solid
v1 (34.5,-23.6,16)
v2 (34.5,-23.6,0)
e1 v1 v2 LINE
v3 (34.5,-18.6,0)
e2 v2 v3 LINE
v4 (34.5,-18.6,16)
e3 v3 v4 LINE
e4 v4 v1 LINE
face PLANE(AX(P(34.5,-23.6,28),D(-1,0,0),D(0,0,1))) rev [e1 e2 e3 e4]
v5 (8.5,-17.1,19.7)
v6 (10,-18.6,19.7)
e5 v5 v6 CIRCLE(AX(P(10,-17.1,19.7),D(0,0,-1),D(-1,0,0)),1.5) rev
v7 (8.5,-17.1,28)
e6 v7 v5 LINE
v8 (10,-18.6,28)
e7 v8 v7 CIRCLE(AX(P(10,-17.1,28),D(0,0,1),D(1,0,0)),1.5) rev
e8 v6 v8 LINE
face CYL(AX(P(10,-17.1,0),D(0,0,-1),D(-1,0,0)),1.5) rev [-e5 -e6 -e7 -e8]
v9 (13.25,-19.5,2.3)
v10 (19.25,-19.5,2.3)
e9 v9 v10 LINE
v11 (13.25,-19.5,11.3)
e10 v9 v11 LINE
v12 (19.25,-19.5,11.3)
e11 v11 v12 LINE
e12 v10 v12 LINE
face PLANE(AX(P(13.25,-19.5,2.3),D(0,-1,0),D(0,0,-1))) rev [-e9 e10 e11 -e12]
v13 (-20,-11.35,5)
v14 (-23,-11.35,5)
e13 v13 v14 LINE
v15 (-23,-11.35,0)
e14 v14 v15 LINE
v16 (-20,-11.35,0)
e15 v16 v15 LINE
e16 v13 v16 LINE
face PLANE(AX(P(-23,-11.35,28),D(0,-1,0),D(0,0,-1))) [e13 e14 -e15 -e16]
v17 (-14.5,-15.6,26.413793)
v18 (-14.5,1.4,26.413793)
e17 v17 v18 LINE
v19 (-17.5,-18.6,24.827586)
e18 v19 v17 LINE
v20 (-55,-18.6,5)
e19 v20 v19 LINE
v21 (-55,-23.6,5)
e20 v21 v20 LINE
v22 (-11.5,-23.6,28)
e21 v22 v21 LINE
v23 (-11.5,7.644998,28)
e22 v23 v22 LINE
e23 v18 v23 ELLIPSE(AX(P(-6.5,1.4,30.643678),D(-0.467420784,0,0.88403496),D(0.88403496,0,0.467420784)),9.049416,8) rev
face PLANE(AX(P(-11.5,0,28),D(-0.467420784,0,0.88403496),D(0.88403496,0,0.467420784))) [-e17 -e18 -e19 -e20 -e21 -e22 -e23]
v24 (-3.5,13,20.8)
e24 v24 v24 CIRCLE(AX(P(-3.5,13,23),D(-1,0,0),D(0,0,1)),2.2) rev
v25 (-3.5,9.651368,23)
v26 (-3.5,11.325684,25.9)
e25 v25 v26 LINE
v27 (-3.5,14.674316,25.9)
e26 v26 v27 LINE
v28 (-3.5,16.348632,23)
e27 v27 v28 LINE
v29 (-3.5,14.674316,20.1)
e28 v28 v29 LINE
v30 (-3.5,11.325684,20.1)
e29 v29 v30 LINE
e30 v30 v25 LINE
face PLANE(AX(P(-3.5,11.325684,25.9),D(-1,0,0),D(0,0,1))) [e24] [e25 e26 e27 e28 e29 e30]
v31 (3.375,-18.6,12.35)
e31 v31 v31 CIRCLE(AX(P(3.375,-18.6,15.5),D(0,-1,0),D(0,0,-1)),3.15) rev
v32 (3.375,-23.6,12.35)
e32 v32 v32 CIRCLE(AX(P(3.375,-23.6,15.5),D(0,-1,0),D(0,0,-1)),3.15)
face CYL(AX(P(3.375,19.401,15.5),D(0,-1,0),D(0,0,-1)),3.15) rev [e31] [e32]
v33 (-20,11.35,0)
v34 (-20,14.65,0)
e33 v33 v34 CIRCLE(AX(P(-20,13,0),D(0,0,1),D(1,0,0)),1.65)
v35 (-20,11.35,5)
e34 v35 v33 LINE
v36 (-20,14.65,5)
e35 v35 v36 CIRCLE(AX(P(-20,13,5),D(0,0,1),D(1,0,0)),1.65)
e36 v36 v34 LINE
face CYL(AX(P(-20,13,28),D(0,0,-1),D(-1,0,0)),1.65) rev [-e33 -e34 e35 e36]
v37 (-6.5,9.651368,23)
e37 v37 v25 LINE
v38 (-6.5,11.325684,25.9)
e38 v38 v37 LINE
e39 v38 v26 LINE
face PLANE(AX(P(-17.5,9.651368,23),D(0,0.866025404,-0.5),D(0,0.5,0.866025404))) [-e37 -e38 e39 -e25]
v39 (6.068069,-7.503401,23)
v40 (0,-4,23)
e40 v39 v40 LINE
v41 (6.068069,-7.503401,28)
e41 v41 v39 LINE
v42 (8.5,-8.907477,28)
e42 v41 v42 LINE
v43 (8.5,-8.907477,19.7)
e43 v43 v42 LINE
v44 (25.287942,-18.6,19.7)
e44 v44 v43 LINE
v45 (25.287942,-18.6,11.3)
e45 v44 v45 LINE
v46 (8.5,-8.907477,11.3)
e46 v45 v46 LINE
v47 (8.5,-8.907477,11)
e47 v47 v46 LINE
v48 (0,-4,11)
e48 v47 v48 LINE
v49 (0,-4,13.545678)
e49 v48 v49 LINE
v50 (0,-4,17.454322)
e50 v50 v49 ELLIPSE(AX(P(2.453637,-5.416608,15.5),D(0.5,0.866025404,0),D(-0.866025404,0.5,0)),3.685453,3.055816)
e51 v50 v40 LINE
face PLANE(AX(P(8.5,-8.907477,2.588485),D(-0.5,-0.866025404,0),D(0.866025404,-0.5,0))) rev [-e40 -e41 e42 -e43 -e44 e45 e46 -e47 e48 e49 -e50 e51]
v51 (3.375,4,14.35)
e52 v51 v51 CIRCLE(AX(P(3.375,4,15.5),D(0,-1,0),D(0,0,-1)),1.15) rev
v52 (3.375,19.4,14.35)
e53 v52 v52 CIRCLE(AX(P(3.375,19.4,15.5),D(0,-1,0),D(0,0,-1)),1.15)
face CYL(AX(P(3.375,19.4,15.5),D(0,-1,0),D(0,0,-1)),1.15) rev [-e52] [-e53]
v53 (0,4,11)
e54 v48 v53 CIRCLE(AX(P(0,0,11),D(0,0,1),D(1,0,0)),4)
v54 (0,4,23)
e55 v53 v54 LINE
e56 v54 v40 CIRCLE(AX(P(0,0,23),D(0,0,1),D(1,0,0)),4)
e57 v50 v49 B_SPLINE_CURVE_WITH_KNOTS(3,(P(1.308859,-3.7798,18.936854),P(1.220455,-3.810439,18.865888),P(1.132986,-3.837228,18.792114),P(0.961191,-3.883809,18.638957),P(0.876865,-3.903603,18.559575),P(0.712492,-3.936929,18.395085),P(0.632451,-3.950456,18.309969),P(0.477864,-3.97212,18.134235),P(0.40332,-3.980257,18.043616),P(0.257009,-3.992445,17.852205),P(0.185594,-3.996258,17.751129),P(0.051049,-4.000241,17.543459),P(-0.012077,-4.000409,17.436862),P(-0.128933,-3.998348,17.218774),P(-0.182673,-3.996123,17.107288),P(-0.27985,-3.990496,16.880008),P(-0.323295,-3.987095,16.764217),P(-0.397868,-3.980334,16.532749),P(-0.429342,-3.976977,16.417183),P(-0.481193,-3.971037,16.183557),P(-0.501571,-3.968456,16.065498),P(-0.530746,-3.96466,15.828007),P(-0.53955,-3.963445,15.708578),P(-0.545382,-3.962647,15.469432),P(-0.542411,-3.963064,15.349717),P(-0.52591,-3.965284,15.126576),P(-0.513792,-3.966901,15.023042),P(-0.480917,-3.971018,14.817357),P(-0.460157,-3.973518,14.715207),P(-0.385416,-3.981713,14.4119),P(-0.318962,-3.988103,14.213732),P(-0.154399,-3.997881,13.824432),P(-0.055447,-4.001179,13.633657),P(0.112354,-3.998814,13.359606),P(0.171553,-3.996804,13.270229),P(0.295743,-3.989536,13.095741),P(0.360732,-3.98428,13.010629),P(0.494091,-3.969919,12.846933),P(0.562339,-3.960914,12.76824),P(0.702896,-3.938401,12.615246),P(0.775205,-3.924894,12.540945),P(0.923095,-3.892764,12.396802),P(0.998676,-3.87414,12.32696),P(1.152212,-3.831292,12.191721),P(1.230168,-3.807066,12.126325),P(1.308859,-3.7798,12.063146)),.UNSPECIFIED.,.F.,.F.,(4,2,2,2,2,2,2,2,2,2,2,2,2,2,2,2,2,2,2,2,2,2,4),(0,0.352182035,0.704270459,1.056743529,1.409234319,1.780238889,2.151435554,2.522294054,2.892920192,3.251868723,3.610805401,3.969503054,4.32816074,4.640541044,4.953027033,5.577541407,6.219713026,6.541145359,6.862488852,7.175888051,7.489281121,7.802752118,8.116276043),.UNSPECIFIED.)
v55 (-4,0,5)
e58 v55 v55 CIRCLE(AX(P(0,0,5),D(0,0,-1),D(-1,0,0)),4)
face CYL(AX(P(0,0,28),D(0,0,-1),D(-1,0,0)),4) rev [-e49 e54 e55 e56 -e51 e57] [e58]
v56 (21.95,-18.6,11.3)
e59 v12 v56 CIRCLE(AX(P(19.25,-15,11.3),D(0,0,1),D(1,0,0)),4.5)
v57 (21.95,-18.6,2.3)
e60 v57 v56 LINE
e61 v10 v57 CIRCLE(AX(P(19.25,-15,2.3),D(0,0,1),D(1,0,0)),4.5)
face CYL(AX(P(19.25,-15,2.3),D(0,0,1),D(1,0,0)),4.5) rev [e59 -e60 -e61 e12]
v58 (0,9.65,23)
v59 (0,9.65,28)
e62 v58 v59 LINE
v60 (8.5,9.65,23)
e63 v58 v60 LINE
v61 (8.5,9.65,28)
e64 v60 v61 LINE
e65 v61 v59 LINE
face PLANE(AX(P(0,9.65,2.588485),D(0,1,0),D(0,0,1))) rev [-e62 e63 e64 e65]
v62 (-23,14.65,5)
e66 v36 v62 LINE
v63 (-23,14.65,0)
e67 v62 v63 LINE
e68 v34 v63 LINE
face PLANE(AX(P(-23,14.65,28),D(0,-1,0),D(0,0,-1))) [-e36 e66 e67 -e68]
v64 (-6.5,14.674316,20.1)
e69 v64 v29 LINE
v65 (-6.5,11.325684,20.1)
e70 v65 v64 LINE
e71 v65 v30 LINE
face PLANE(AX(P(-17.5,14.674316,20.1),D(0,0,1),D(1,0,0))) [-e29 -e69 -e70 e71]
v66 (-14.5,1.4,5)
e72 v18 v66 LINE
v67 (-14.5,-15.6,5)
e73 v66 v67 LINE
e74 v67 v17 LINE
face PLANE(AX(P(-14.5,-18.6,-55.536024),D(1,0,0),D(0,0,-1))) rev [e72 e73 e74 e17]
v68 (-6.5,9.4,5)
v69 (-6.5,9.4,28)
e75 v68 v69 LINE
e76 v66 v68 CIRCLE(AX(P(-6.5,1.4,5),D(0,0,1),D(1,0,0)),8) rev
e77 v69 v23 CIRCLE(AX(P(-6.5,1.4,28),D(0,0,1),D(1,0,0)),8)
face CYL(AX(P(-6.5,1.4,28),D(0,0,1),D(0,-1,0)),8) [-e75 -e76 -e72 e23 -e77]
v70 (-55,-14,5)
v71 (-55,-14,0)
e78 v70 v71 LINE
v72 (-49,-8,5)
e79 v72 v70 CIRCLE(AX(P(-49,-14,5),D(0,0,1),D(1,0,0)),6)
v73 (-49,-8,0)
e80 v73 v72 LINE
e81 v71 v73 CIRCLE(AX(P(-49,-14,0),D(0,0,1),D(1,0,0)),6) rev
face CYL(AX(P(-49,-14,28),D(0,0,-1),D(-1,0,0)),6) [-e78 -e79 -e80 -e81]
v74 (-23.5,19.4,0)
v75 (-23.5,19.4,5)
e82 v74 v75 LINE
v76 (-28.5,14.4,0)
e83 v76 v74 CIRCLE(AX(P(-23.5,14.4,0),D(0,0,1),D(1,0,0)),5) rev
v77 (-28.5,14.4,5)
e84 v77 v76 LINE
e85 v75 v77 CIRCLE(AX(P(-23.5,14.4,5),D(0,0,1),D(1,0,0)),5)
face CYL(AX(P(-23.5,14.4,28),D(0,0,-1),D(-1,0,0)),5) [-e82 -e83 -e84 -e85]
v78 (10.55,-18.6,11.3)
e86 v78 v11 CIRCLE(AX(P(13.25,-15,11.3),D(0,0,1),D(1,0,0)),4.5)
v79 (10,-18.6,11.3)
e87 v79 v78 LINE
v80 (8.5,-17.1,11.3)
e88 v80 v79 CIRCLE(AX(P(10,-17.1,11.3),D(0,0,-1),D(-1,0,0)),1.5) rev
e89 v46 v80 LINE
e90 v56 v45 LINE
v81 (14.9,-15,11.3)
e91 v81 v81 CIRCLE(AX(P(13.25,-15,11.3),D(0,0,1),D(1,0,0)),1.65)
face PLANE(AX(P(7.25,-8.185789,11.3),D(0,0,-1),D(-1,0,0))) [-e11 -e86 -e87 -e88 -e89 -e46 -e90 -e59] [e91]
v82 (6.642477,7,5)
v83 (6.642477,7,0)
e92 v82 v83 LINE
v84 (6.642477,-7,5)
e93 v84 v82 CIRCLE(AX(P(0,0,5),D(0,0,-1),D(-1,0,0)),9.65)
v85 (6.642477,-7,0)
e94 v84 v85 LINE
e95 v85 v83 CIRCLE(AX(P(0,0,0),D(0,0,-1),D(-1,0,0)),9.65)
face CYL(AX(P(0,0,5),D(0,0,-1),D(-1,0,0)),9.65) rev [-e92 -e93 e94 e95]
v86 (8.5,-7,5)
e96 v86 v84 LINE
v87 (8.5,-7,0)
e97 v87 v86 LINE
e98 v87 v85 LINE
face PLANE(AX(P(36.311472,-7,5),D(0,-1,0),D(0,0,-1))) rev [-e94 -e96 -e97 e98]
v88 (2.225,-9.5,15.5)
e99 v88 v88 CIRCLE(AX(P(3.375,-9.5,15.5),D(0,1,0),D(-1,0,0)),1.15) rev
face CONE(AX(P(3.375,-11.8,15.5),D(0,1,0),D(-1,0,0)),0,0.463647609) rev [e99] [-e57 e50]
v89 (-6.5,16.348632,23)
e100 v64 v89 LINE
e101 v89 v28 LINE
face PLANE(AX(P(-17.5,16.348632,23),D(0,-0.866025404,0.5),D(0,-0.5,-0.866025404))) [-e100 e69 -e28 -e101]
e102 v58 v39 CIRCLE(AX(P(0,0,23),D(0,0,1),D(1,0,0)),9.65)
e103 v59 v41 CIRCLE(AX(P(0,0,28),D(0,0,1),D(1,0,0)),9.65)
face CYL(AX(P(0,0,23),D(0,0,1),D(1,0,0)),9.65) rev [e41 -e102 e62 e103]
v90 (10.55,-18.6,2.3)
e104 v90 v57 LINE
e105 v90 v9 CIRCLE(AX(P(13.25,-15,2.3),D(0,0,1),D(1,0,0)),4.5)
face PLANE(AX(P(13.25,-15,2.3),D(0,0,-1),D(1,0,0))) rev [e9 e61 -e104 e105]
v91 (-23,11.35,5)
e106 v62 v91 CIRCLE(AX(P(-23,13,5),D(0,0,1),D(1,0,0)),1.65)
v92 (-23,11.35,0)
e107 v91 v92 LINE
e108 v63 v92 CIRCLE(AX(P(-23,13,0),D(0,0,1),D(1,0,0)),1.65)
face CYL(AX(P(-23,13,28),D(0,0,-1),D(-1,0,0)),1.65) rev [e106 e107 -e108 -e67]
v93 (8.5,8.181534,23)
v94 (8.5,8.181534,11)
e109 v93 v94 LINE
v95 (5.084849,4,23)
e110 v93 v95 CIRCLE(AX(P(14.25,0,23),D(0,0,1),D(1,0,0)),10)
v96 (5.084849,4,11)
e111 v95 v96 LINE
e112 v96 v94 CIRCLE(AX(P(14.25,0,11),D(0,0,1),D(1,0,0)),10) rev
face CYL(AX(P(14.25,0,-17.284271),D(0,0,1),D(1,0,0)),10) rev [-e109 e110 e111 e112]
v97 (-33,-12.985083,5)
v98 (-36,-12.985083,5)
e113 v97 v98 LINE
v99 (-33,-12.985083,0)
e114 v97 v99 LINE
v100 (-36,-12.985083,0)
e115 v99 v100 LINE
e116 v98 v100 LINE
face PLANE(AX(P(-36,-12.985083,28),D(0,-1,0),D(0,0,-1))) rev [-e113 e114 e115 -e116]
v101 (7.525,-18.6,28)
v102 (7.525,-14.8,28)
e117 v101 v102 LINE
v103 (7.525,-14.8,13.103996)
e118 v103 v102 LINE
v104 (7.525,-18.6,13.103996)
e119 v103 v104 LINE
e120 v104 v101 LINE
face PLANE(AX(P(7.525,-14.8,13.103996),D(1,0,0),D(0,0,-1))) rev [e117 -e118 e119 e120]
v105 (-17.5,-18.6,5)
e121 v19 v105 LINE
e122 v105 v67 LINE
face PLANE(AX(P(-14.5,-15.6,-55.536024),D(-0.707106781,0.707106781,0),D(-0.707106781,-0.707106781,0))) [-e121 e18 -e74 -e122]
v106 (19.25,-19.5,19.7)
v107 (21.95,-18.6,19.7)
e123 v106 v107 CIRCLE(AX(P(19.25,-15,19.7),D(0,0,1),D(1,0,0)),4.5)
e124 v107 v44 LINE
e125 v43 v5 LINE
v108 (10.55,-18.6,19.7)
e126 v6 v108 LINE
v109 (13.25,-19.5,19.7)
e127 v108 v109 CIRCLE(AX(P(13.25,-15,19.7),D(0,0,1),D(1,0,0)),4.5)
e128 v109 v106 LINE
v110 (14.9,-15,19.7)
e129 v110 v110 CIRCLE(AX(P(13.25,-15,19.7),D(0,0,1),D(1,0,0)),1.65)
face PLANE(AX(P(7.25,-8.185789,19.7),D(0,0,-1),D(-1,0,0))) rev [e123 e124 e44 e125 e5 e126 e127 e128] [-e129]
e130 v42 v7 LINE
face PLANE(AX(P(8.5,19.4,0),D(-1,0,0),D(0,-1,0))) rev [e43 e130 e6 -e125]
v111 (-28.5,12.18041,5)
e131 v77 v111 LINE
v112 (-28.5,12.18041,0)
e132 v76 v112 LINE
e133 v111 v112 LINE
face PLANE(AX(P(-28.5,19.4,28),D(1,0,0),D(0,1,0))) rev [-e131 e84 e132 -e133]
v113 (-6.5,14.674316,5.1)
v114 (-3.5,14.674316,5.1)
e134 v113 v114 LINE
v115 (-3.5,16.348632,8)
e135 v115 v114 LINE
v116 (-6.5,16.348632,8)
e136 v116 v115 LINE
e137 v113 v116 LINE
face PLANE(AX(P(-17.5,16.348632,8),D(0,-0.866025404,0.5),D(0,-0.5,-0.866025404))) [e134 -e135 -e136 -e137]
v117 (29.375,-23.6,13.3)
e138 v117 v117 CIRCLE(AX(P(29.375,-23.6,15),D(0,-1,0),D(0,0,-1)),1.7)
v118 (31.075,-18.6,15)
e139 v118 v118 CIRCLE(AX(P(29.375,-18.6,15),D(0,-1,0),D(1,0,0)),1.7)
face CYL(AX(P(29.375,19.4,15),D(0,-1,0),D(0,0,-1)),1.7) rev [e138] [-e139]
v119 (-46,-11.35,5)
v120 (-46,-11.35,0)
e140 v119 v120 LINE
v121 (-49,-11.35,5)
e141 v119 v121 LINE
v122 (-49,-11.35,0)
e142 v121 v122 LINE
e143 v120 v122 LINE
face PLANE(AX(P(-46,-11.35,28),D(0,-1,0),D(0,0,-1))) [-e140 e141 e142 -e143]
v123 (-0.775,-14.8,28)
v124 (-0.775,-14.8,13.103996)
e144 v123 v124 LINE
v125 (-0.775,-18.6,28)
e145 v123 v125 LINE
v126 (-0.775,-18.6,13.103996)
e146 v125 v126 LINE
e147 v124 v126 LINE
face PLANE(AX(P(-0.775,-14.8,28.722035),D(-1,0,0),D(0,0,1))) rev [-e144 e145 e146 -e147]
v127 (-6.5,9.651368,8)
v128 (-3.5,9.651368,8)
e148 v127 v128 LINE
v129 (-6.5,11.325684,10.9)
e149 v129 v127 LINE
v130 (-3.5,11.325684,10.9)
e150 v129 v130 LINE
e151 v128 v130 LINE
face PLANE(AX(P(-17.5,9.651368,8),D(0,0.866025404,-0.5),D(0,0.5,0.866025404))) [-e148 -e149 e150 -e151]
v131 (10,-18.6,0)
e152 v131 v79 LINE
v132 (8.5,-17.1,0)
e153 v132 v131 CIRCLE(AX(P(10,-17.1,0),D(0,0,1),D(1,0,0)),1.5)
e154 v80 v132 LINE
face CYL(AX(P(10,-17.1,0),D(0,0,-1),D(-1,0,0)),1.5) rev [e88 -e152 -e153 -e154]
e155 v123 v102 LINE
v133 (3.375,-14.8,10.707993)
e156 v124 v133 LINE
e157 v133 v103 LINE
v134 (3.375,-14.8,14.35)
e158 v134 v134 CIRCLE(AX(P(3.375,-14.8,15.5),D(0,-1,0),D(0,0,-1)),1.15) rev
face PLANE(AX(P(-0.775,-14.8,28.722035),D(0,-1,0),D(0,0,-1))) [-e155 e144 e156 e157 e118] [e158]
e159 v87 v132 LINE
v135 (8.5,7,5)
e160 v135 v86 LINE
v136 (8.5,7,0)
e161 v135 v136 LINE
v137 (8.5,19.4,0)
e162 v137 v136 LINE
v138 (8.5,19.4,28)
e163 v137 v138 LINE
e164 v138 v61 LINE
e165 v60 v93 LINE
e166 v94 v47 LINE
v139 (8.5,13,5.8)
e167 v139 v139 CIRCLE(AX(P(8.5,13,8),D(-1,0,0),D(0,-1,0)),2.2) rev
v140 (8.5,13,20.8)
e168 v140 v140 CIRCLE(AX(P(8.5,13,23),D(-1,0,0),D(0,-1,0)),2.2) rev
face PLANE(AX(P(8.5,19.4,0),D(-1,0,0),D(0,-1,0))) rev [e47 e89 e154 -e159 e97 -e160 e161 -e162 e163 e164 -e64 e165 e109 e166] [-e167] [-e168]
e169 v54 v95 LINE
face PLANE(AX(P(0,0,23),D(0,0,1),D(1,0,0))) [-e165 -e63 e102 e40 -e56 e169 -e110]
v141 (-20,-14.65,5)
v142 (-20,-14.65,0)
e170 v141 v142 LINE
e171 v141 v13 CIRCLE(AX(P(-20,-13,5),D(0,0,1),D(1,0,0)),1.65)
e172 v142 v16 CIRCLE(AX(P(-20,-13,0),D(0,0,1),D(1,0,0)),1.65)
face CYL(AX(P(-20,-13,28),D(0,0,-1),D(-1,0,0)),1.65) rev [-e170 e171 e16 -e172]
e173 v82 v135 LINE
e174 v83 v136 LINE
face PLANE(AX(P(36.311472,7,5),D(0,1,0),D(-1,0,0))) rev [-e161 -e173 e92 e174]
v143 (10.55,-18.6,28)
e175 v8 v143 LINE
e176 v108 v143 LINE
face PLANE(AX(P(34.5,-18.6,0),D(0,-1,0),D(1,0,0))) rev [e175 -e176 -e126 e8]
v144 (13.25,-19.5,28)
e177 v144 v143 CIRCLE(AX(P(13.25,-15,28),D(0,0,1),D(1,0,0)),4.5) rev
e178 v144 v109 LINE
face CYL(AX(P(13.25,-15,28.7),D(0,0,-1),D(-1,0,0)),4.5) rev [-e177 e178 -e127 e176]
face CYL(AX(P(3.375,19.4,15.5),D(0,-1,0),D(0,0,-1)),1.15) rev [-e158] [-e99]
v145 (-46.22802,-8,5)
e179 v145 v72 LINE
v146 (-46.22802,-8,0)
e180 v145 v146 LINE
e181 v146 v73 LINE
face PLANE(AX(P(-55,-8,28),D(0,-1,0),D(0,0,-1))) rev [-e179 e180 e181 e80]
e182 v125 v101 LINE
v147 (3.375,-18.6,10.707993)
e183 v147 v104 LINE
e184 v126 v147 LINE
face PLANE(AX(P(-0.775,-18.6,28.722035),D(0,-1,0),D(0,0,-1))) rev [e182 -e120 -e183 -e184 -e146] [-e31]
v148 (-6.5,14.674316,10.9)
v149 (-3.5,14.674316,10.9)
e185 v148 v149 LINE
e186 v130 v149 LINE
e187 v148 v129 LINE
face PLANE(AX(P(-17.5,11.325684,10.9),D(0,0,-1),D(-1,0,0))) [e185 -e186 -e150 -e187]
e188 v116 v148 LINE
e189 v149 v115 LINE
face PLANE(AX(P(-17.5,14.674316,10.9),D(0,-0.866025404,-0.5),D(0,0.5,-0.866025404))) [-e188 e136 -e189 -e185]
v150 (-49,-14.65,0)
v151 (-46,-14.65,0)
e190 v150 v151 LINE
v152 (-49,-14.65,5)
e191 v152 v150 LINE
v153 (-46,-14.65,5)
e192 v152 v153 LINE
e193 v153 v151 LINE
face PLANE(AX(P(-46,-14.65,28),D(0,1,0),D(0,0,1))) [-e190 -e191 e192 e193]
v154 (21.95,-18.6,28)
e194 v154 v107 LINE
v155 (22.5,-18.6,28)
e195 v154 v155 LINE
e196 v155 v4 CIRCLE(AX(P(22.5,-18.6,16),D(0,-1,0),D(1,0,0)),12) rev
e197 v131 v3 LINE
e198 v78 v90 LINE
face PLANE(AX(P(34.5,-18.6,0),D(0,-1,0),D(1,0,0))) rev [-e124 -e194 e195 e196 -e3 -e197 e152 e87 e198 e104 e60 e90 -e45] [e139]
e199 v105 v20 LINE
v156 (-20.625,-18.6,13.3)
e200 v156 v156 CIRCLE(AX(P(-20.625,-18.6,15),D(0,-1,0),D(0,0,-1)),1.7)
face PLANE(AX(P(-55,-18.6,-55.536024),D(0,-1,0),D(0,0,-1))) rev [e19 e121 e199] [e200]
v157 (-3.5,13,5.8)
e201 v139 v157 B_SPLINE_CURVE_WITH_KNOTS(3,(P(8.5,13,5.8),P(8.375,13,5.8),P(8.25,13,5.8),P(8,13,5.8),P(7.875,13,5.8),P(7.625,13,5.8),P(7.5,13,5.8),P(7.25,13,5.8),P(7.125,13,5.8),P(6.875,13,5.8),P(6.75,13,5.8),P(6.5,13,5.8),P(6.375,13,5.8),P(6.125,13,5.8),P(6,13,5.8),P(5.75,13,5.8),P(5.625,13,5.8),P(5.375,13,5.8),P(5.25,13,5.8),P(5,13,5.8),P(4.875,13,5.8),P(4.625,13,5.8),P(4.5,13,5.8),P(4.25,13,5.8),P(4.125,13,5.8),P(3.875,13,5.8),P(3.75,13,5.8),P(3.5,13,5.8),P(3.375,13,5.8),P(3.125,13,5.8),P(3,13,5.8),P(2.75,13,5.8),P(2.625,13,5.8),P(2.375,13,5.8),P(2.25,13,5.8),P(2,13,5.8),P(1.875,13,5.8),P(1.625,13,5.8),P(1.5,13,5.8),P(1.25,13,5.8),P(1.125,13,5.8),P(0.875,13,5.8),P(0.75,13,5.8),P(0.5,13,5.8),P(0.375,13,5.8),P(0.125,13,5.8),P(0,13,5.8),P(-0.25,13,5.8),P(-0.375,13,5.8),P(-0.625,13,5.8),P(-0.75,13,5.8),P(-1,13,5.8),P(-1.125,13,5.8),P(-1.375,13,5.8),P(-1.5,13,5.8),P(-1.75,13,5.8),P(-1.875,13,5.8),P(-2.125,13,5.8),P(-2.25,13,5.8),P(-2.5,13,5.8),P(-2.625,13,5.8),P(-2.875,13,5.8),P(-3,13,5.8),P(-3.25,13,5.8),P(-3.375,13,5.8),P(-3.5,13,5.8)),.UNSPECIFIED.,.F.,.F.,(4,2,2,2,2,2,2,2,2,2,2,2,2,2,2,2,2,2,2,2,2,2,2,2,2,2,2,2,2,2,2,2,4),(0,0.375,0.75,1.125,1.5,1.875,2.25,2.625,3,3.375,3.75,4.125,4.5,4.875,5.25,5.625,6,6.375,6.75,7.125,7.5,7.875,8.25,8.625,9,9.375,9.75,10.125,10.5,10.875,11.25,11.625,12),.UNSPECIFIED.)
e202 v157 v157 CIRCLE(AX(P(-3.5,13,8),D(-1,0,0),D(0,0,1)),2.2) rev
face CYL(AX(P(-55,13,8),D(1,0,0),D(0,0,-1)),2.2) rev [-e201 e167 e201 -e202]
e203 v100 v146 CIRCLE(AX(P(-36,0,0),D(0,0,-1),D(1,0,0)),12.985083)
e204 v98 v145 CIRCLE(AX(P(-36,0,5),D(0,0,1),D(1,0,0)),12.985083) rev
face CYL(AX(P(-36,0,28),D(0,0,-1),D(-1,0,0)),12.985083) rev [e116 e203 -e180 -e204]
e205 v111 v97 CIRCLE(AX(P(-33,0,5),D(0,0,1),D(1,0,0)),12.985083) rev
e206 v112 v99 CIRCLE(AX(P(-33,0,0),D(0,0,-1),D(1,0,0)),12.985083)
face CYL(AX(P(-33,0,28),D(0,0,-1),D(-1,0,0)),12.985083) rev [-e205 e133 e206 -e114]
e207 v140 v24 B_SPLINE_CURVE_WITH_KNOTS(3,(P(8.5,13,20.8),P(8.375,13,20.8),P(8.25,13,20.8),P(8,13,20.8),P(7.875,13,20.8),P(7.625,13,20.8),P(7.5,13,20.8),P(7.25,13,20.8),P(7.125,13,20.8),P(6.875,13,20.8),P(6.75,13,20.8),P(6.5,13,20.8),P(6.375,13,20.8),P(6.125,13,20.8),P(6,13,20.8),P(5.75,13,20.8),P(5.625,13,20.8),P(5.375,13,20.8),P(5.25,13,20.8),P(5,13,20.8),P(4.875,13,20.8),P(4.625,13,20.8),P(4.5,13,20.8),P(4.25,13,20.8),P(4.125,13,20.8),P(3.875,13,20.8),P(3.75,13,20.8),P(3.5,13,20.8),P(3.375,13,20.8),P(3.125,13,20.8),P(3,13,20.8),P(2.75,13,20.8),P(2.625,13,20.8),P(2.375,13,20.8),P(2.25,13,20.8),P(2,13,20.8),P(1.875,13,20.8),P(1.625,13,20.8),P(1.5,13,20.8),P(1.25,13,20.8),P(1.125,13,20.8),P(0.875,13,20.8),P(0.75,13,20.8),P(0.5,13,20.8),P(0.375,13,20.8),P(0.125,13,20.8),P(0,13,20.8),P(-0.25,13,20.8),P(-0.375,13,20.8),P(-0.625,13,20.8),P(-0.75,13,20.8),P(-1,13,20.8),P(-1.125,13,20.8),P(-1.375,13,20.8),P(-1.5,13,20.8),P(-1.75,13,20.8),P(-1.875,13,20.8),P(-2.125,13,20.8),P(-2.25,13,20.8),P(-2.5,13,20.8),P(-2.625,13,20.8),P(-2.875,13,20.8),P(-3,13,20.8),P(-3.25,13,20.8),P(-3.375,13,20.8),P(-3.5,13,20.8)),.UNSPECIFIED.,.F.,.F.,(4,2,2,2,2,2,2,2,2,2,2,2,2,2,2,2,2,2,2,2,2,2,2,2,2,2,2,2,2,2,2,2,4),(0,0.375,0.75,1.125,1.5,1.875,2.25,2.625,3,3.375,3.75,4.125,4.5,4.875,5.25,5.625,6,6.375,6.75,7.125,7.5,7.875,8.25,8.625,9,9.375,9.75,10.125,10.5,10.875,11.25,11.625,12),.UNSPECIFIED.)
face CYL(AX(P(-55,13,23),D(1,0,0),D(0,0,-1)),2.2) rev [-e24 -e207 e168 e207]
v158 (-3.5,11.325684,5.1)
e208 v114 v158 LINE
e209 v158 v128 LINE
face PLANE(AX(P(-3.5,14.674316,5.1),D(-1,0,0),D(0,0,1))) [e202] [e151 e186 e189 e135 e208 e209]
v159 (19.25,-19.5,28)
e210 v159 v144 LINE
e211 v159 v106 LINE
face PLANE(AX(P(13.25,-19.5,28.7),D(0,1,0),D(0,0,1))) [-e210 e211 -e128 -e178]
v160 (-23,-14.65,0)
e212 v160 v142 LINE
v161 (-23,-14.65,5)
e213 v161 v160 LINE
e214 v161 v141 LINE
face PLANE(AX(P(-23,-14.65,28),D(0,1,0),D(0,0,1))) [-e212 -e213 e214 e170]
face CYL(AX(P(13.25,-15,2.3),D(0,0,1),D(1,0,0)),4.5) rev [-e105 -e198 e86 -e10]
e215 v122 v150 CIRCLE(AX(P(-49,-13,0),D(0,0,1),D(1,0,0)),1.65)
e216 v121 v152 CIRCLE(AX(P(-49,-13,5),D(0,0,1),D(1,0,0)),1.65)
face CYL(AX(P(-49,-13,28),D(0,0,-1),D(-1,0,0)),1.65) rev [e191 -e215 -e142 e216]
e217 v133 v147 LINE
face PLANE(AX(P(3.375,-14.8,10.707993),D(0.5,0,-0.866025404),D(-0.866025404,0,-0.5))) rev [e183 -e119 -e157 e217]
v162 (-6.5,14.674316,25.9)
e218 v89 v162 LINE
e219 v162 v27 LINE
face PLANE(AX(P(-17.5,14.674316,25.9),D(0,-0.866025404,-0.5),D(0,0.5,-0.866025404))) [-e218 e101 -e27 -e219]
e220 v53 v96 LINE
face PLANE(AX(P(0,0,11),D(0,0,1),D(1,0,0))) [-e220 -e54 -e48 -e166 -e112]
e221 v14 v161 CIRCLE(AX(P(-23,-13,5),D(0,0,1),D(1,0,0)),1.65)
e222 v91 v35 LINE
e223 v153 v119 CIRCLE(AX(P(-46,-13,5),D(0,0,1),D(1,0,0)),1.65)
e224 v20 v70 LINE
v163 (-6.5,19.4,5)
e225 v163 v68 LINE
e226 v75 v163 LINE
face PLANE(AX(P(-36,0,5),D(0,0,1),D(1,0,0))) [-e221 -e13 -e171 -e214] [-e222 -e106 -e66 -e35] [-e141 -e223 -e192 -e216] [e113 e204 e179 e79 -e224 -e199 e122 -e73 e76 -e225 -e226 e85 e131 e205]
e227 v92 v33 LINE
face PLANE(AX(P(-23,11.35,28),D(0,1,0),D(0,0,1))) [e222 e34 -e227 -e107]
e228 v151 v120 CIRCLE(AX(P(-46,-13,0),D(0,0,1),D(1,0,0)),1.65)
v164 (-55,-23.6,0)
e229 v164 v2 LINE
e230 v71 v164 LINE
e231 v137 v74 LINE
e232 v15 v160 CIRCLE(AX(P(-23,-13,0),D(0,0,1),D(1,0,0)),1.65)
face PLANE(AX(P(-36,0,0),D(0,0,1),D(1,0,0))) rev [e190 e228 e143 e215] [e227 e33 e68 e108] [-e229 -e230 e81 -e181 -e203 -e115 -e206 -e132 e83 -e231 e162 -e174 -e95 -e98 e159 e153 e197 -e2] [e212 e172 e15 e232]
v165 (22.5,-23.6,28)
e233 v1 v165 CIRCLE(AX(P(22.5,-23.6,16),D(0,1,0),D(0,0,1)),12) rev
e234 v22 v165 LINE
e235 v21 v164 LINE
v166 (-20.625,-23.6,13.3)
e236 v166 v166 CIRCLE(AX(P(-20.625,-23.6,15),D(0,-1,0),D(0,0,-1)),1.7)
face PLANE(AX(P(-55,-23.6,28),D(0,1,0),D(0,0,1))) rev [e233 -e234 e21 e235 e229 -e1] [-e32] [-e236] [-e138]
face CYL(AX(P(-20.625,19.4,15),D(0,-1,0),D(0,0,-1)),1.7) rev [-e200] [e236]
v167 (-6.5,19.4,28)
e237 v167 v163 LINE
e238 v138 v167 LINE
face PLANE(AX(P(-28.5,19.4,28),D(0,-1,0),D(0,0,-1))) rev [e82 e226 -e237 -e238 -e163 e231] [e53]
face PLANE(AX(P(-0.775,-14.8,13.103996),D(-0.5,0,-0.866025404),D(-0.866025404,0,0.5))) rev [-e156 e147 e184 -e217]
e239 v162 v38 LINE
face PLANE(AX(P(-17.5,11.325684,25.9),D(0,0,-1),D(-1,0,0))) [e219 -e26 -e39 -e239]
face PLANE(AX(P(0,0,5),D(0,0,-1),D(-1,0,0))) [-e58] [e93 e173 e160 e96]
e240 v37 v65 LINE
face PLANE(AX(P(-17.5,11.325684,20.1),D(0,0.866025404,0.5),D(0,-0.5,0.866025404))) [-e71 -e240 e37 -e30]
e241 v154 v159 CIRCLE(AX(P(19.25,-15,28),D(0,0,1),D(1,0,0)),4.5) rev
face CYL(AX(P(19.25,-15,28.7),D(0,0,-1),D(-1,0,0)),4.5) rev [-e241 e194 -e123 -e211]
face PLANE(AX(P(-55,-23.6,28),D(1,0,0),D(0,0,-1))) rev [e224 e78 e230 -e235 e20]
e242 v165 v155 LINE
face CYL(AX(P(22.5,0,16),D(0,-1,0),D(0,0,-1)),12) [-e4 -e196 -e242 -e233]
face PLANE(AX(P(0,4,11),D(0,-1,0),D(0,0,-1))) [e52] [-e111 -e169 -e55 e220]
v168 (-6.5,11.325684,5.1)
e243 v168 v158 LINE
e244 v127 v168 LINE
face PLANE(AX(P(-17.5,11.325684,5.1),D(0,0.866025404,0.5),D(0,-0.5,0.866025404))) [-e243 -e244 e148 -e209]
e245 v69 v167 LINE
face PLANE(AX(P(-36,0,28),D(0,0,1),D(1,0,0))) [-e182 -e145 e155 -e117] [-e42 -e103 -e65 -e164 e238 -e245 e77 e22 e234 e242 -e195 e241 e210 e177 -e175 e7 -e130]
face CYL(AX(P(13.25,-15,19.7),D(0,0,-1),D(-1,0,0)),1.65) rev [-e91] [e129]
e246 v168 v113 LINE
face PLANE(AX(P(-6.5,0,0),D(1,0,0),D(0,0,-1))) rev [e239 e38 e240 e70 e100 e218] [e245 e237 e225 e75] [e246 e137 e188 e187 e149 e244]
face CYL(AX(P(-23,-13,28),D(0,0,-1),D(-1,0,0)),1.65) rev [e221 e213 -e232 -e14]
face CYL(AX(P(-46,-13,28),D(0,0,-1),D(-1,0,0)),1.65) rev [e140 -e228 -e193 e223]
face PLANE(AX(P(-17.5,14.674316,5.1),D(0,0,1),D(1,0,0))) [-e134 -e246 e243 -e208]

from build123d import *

# Parameters (mm, degrees)
SKETCH1_R                = 4
BOSS_EXTRUDE1_DEPTH      = 28
SKETCH2_W                = 40.5
SKETCH2_H                = 38
CUT_EXTRUDE1_DEPTH       = 23
SKETCH3_R                = 9.65
CUT_EXTRUDE2_DEPTH       = 5
SKETCH8_R                = 1.15
CUT_EXTRUDE7_DEPTH       = 76.219678276
SKETCH9_R                = 2.2
CUT_EXTRUDE8_DEPTH       = 97.701654612
CUT_EXTRUDE9_DEPTH       = 3
CUT_EXTRUDE9_DEPTH_BACK  = 11
CHAMFER2_SIZE            = 3
SKETCH16_W               = 26
SKETCH16_H               = 38
CUT_EXTRUDE12_DEPTH      = 67.075411541
CUT_EXTRUDE3_START       = -5
CUT_EXTRUDE3_DEPTH       = 5
FILLET6_R                = 1.5
CUT_EXTRUDE13_START      = -5
CUT_EXTRUDE13_DEPTH      = 5
BOSS_EXTRUDE3_DEPTH      = 4.2
BOSS_EXTRUDE3_DEPTH_BACK = 4.2
SKETCH21_R               = 1.65
SKETCH15_R               = 1.7
CUT_EXTRUDE11_DEPTH      = 76.219678334
CUT_EXTRUDE14_DEPTH      = 9
FILLET1_R                = 5
FILLET2_R                = 6
FILLET4_R                = 12
CUT_EXTRUDE15_DEPTH      = 3.8
CUT_EXTRUDE18_REACH      = 77.22
SKETCH26_R               = 3.15
CUT_EXTRUDE19_START      = -12
CUT_EXTRUDE19_DEPTH      = 12
CUT_EXTRUDE20_DEPTH      = 62.824024457
CUT_EXTRUDE20_DEPTH_BACK = 4.5
SKETCH28_R               = 10
SKETCH29_W               = 23
SKETCH29_H               = 10
CUT_EXTRUDE21_DEPTH      = 8
FILLET7_R                = 8
CHAMFER1_SIZE            = 23
CHAMFER1_SIZE2           = 43.5


with BuildPart() as part:
    # Sketch1 → Boss-Extrude1 (new body)
    with BuildSketch(Plane.XY):
        with BuildLine():
            Line((-55, -23.6), (34.5, -23.6))
            Line((34.5, -23.6), (34.5, 19.4))
            Line((34.5, 19.4), (-28.5, 19.4))
            Line((-28.5, 19.4), (-28.5, 12.180409823))
            ThreePointArc((-28.5, 12.180409823), (-20.217668105, -2.285689125), (-33, -12.985083113))
            Line((-33, -12.985083113), (-36, -12.985083113))
            ThreePointArc((-36, -12.985083113), (-41.689100041, -11.672468641), (-46.228019527, -8))
            Line((-46.228019527, -8), (-55, -8))
            Line((-55, -8), (-55, -23.6))
        make_face()
        Circle(SKETCH1_R, mode=Mode.SUBTRACT)
        with BuildLine():
            Line((-23, 11.35), (-20, 11.35))
            ThreePointArc((-20, 11.35), (-18.35, 13), (-20, 14.65))
            Line((-20, 14.65), (-23, 14.65))
            ThreePointArc((-23, 14.65), (-24.65, 13), (-23, 11.35))
        make_face(mode=Mode.SUBTRACT)
        with BuildLine():
            Line((-23, -14.65), (-20, -14.65))
            ThreePointArc((-20, -14.65), (-18.35, -13), (-20, -11.35))
            Line((-20, -11.35), (-23, -11.35))
            ThreePointArc((-23, -11.35), (-24.65, -13), (-23, -14.65))
        make_face(mode=Mode.SUBTRACT)
        with BuildLine():
            Line((-46, -11.35), (-49, -11.35))
            ThreePointArc((-49, -11.35), (-50.65, -13), (-49, -14.65))
            Line((-49, -14.65), (-46, -14.65))
            ThreePointArc((-46, -14.65), (-44.35, -13), (-46, -11.35))
        make_face(mode=Mode.SUBTRACT)
    extrude(amount=BOSS_EXTRUDE1_DEPTH)

    # Sketch2 → Cut-Extrude1 (cut)
    with BuildSketch(Plane.XY.offset(28)):
        with Locations((-34.75, 0.4)):
            Rectangle(SKETCH2_W, SKETCH2_H)
    extrude(amount=-CUT_EXTRUDE1_DEPTH, mode=Mode.SUBTRACT)

    # Sketch3 → Cut-Extrude2 (cut)
    with BuildSketch(Plane.XY.offset(28)):
        Circle(SKETCH3_R)
    extrude(amount=-CUT_EXTRUDE2_DEPTH, mode=Mode.SUBTRACT)

    # Sketch8 → Cut-Extrude7 (cut, through all)
    with BuildSketch(Plane.XZ.offset(23.6)):
        with Locations(Location((3.375, 15.5, 0), (0, 0, 270))):
            Circle(SKETCH8_R)
    extrude(amount=-CUT_EXTRUDE7_DEPTH, mode=Mode.SUBTRACT)

    # Sketch9 → Cut-Extrude8 (cut, through all)
    with BuildSketch(Plane(origin=(34.5, 0, 0), x_dir=(0, 0, -1), z_dir=(1, 0, 0))):
        with Locations((-8, 13)):
            Circle(SKETCH9_R)
        with Locations((-23, 13)):
            Circle(SKETCH9_R)
    extrude(amount=-CUT_EXTRUDE8_DEPTH, mode=Mode.SUBTRACT)

    # Sketch10 → Cut-Extrude9 (cut, two sides: drawn at the far end of the back side and taken through both)
    with BuildSketch(Plane.ZY.offset(14.5).offset(-CUT_EXTRUDE9_DEPTH_BACK)):
        Polygon((5.1, 14.674315781), (5.1, 11.325684219), (8, 9.651368439), (10.9, 11.325684219), (10.9, 14.674315781), (8, 16.348631561), align=None)
        Polygon((25.9, 11.325684219), (25.9, 14.674315781), (23, 16.348631561), (20.1, 14.674315781), (20.1, 11.325684219), (23, 9.651368439), align=None)
    extrude(amount=CUT_EXTRUDE9_DEPTH + CUT_EXTRUDE9_DEPTH_BACK, mode=Mode.SUBTRACT)

    # Chamfer2
    chamfer2_edges = [part.edges().sort_by_distance(p)[0] for p in [
        (-14.5, -18.6, 16.5),
    ]]
    chamfer(chamfer2_edges, length=CHAMFER2_SIZE)

    # Sketch16 → Cut-Extrude12 (cut, through all)
    with BuildSketch(Plane.XY.offset(28)):
        with Locations((21.5, 0.4)):
            Rectangle(SKETCH16_W, SKETCH16_H)
    extrude(amount=-CUT_EXTRUDE12_DEPTH, mode=Mode.SUBTRACT)

    # Sketch4 → Cut-Extrude3 (cut)
    with BuildSketch(Plane(origin=(0, 0, 0), x_dir=(-1, 0, 0), z_dir=(0, 0, -1)).offset(CUT_EXTRUDE3_START)):
        with BuildLine():
            Line((-36.31147183, -7), (-6.642476948, -7))
            ThreePointArc((-6.642476948, -7), (9.65, 0), (-6.642476948, 7))
            Line((-6.642476948, 7), (-36.31147183, 7))
            Line((-36.31147183, 7), (-36.31147183, -7))
        make_face()
    extrude(amount=CUT_EXTRUDE3_DEPTH, mode=Mode.SUBTRACT)

    # Fillet6
    fillet6_edges = [part.edges().sort_by_distance(p)[0] for p in [
        (8.5, -18.6, 14),
    ]]
    fillet(fillet6_edges, radius=FILLET6_R)

    # Sketch17 → Cut-Extrude13 (cut)
    with BuildSketch(Plane.XY.offset(28).offset(CUT_EXTRUDE13_START)):
        with BuildLine():
            Line((0, 4), (0, 9.65))
            Line((0, 9.65), (8.5, 9.65))
            Line((8.5, 9.65), (8.5, -8.907477288))
            Line((8.5, -8.907477288), (0, -4))
            ThreePointArc((0, -4), (4, 0), (0, 4))
        make_face()
    extrude(amount=CUT_EXTRUDE13_DEPTH, mode=Mode.SUBTRACT)

    # Sketch20 → Cut-Revolve1 (revolve, cut)
    with BuildSketch(Plane.XY.offset(15.5), mode=Mode.PRIVATE) as cut_revolve1_sk:
        Polygon((3.375, -11.8), (7.375, -3.8), (3.375, -3.8), align=None)
    revolve(cut_revolve1_sk.sketch.rotate(Axis((3.375, -3.8, 15.5), (0, -1, 0)), 270), axis=Axis((3.375, -3.8, 15.5), (0, -1, 0)), mode=Mode.SUBTRACT)

    # Sketch21 → Boss-Extrude3 (add, two sides: drawn at the far end of the back side and taken through both)
    with BuildSketch(Plane.XY.offset(15.5).offset(-BOSS_EXTRUDE3_DEPTH_BACK)):
        Polygon((7.25, -8.185789452), (7.25, -18.6), (25.287941791, -18.6), align=None)
        with Locations((13.25, -15)):
            Circle(SKETCH21_R, mode=Mode.SUBTRACT)
    extrude(amount=BOSS_EXTRUDE3_DEPTH + BOSS_EXTRUDE3_DEPTH_BACK)

    # Sketch15 → Cut-Extrude11 (cut, through all)
    with BuildSketch(Plane.XZ.offset(23.6)):
        with Locations(Location((-20.625, 15, 0), (0, 0, 270))):
            Circle(SKETCH15_R)
        with Locations(Location((29.375, 15, 0), (0, 0, 270))):
            Circle(SKETCH15_R)
    extrude(amount=-CUT_EXTRUDE11_DEPTH, mode=Mode.SUBTRACT)

    # Sketch22 → Cut-Extrude14 (cut)
    with BuildSketch(Plane.XY.offset(19.7)):
        with BuildLine():
            Line((13.25, -19.5), (19.25, -19.5))
            ThreePointArc((19.25, -19.5), (23.75, -15), (19.25, -10.5))
            Line((19.25, -10.5), (13.25, -10.5))
            ThreePointArc((13.25, -10.5), (8.75, -15), (13.25, -19.5))
        make_face()
    cut_extrude14 = extrude(amount=CUT_EXTRUDE14_DEPTH, mode=Mode.SUBTRACT)

    # Mirror1: Cut-Extrude14 across plane
    add(cut_extrude14.mirror(Plane.XY.offset(15.5)), mode=Mode.SUBTRACT)

    # Fillet1
    fillet1_edges = [part.edges().sort_by_distance(p)[0] for p in [
        (-28.5, 19.4, 2.5),
    ]]
    fillet(fillet1_edges, radius=FILLET1_R)

    # Fillet2
    fillet2_edges = [part.edges().sort_by_distance(p)[0] for p in [
        (-55, -8, 2.5),
    ]]
    fillet(fillet2_edges, radius=FILLET2_R)

    # Fillet4
    fillet4_edges = [part.edges().sort_by_distance(p)[0] for p in [
        (34.5, -21.1, 28),
    ]]
    fillet(fillet4_edges, radius=FILLET4_R)

    # Sketch23 → Cut-Extrude15 (cut)
    with BuildSketch(Plane.XZ.offset(18.6)):
        Polygon((-0.775, 28.722034997), (7.525, 28.722034997), (7.525, 13.103996383), (3.375, 10.707992766), (-0.775, 13.103996383), align=None)
    extrude(amount=-CUT_EXTRUDE15_DEPTH, mode=Mode.SUBTRACT)

    # Sketch26 → Cut-Extrude18 (cut, up to next)
    with BuildSketch(Plane.XZ.offset(23.6), mode=Mode.PRIVATE) as cut_extrude18_sk1:
        with Locations(Location((3.375, 15.5, 0), (0, 0, 270))):
            Circle(SKETCH26_R)
    cut_extrude18_tool1 = extrude(cut_extrude18_sk1.sketch, amount=-CUT_EXTRUDE18_REACH, mode=Mode.PRIVATE) & part.part
    add(cut_extrude18_tool1.solids().sort_by_distance((3.375, -23.6, 15.5))[0], mode=Mode.SUBTRACT)

    # Sketch27 → Cut-Extrude19 (cut)
    with BuildSketch(Plane.XY.offset(23).offset(CUT_EXTRUDE19_START)):
        with BuildLine():
            Line((8.5, -8.907477288), (0, -4))
            ThreePointArc((0, -4), (-4, 0), (0, 4))
            Line((0, 4), (8.5, 4))
            Line((8.5, 4), (8.5, -8.907477288))
        make_face()
    extrude(amount=CUT_EXTRUDE19_DEPTH, mode=Mode.SUBTRACT)

    # Sketch28 → Cut-Extrude20 (cut, two sides: drawn at the far end of the back side and taken through both)
    with BuildSketch(Plane.XY.offset(15.5).offset(-CUT_EXTRUDE20_DEPTH_BACK)):
        with Locations((14.25, 0)):
            Circle(SKETCH28_R)
    extrude(amount=CUT_EXTRUDE20_DEPTH + CUT_EXTRUDE20_DEPTH_BACK, mode=Mode.SUBTRACT)

    # Sketch29 → Cut-Extrude21 (cut)
    with BuildSketch(Plane.ZY.offset(14.5)):
        with Locations((16.5, 14.4)):
            Rectangle(SKETCH29_W, SKETCH29_H)
    extrude(amount=-CUT_EXTRUDE21_DEPTH, mode=Mode.SUBTRACT)

    # Fillet7
    fillet7_edges = [part.edges().sort_by_distance(p)[0] for p in [
        (-14.5, 9.4, 16.5),
    ]]
    fillet(fillet7_edges, radius=FILLET7_R - 0.0001)  # a hair under: the kernel refuses the full size

    # Chamfer1
    chamfer1_edges = [part.edges().sort_by_distance(p)[0] for p in [
        (-55, -21.1, 28),
    ]]
    chamfer1_side = [part.faces().sort_by_distance(p)[0] for p in [
        (-55, -20.422699387, 12.377300613),
    ]]
    chamfer(chamfer1_edges, length=CHAMFER1_SIZE, length2=CHAMFER1_SIZE2, reference=chamfer1_side[0])


solid = part.part
